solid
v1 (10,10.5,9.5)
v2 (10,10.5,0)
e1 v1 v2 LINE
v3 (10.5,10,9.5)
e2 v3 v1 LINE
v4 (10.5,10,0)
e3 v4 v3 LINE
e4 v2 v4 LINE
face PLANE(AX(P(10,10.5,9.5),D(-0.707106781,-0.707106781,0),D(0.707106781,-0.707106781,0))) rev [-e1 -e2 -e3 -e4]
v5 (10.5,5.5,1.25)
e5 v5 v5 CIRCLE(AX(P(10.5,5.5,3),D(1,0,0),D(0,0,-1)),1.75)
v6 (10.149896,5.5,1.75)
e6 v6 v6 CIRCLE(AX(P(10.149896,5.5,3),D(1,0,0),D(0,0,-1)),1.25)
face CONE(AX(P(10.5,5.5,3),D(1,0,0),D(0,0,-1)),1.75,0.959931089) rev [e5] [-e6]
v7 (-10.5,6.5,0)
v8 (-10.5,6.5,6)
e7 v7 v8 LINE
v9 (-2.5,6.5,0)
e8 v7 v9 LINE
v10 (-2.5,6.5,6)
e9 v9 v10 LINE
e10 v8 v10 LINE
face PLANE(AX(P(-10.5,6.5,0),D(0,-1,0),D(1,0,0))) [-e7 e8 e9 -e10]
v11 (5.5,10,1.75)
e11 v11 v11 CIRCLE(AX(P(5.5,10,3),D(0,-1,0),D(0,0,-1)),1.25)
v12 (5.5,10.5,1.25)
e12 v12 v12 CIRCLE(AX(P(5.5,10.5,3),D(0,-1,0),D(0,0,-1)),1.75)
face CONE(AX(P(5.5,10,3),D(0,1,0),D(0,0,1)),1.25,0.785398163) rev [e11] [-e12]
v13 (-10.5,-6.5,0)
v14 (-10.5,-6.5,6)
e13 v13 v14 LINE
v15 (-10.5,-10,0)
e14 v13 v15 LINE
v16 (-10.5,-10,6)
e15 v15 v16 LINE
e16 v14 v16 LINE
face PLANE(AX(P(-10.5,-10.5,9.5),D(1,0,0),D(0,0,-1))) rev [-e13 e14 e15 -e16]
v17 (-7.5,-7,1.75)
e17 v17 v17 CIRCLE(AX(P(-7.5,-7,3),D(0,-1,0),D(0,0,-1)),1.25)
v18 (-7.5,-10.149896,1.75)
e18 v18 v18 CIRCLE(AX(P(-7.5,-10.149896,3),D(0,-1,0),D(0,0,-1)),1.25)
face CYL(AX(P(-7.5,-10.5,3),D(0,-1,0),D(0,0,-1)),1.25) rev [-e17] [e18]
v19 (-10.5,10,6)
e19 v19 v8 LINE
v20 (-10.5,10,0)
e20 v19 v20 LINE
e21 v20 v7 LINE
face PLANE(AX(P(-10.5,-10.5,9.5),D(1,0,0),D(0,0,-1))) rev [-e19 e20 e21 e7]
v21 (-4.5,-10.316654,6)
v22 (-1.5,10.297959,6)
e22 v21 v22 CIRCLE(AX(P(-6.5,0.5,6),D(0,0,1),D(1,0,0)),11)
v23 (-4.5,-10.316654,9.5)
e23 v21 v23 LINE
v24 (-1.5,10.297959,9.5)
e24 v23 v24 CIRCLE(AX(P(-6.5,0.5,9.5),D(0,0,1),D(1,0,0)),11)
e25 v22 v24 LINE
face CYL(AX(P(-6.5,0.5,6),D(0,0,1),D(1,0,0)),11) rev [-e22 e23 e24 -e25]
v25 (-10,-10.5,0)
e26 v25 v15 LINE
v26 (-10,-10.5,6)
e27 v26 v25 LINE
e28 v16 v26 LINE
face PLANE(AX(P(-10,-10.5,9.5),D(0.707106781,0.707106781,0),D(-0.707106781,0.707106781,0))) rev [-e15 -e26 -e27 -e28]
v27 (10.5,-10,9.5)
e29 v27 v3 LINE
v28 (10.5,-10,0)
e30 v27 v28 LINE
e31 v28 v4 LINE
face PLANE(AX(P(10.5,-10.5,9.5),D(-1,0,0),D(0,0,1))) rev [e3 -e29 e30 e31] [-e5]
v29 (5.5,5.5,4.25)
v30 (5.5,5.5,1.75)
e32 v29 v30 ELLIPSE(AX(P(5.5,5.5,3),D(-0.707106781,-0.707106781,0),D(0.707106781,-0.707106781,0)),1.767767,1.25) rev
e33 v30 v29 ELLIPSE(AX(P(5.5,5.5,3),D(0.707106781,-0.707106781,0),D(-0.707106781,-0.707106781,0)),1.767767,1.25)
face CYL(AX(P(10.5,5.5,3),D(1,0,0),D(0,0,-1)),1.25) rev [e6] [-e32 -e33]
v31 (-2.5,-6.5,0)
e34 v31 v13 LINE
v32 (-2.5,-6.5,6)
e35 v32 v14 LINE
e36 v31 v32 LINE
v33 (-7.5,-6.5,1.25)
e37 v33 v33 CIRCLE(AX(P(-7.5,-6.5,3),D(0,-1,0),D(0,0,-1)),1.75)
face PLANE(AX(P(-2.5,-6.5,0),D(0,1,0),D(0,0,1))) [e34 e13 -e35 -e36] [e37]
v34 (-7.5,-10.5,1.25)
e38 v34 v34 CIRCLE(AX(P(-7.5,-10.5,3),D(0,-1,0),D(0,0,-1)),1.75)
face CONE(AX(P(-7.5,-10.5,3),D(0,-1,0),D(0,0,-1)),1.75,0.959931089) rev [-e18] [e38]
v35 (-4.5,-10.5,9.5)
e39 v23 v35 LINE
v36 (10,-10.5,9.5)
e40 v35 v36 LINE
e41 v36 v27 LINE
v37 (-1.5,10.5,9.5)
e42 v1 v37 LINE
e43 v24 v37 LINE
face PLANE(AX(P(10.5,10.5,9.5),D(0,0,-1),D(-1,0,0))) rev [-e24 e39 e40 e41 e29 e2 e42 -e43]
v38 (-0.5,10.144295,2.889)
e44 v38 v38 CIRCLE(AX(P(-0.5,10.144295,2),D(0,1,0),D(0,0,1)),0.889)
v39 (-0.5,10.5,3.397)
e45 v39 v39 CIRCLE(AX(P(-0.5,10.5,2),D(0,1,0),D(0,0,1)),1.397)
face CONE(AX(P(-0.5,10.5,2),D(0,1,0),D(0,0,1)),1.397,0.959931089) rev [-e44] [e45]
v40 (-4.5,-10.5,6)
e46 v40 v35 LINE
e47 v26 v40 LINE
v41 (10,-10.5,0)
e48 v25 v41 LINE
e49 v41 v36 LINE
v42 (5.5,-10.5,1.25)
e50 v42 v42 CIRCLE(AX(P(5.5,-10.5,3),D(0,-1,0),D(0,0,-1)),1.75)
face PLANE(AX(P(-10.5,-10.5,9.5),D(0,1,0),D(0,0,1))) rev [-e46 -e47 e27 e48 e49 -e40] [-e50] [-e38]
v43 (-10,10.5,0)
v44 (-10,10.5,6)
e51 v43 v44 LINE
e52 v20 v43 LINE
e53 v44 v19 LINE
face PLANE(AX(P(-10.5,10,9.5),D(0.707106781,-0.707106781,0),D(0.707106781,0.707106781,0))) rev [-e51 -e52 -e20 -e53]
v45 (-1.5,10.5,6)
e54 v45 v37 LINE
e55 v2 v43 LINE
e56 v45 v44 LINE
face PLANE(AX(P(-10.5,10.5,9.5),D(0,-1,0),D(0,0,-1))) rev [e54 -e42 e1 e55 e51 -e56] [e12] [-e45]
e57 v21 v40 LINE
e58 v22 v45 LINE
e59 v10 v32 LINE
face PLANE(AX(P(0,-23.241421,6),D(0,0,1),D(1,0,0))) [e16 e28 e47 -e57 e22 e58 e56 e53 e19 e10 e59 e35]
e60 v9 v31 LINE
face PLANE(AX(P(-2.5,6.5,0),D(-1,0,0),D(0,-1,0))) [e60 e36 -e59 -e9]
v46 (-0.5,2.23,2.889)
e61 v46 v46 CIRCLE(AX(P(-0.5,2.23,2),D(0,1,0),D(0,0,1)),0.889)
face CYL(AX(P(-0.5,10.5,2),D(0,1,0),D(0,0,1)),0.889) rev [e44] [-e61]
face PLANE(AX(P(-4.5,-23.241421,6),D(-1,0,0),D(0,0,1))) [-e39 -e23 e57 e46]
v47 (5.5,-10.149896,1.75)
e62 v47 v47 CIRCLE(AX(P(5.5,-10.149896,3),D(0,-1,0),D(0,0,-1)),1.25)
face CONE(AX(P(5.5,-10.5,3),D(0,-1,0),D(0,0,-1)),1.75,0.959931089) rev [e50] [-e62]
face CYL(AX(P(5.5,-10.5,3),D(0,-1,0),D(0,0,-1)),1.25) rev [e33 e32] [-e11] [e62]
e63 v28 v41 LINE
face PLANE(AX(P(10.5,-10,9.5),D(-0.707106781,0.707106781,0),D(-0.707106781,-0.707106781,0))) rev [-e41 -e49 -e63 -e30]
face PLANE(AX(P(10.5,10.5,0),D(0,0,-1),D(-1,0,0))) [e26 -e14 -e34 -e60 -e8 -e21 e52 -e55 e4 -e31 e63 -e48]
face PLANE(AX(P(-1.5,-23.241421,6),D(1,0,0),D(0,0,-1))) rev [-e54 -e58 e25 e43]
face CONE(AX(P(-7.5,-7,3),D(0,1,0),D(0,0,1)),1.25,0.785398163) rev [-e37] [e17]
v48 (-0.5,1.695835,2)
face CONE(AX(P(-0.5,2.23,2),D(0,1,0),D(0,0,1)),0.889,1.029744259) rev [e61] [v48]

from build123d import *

# Parameters (mm, degrees)
SKETCH_1_W                    = 21
SKETCH_1_H                    = 21
EXTRUDE_1_DEPTH               = 9.5
CUT_EXTRUDE_3_DEPTH           = 3.5
CUT_EXTRUDE_4_DEPTH           = 18.628102564
CHAMFER_1_SIZE                = 0.5
HOLE_WIZARD_2_561_D           = 1.778
HOLE_WIZARD_2_561_DEPTH       = 8.27
HOLE_WIZARD_2_561_CSINK_D     = 2.794
HOLE_WIZARD_2_561_CSINK_ANGLE = 110
HOLE_WIZARD_2_561_TIP         = 0.53416509


# Read off the part's stored shape, not the designer's step: Отверстие обработанное метчиком M31, Отверстие обработанное метчиком M32
with BuildPart() as part:
    # Эскиз1 → Бобышка-Вытянуть1 (new body)
    with BuildSketch(Plane.XY):
        Rectangle(SKETCH_1_W, SKETCH_1_H)
    extrude(amount=EXTRUDE_1_DEPTH)

    # Эскиз2 → Вырез-Вытянуть3 (cut)
    with BuildSketch(Plane.XY.offset(9.5)):
        with BuildLine():
            ThreePointArc((-4.5, -10.316653826), (4.385337165, -1.084119567), (-1.5, 10.297958971))
            Line((-1.5, 10.297958971), (-1.5, 10.5))
            Line((-1.5, 10.5), (-10.5, 10.5))
            Line((-10.5, 10.5), (-10.5, -10.5))
            Line((-10.5, -10.5), (-4.5, -10.5))
            Line((-4.5, -10.5), (-4.5, -10.316653826))
        make_face()
    extrude(amount=-CUT_EXTRUDE_3_DEPTH, mode=Mode.SUBTRACT)

    # Эскиз3 → Вырез-Вытянуть4 (cut, through all)
    with BuildSketch(Plane(origin=(0, 0, 0), x_dir=(-1, 0, 0), z_dir=(0, 0, -1))):
        Polygon((74.537024344, 6.5), (10.5, 6.5), (2.5, 6.5), (2.5, -6.5), (10.5, -6.5), (74.537024344, -6.5), (202.611073033, -6.5), (202.611073033, 6.5), align=None)
    extrude(amount=-CUT_EXTRUDE_4_DEPTH, mode=Mode.SUBTRACT)

    # Отверстие обработанное метчиком M31 outline → Отверстие обработанное метчиком M31 (revolve, cut)
    with BuildSketch(Plane(origin=(5.5, 0, 3), x_dir=(1, 0, 0), z_dir=(0, 0, 1))):
        Polygon((1.75, 10.5), (0, 10.5), (0, -10.5), (1.75, -10.5), (1.25, -10.149896231), (1.25, 10), align=None)
    revolve(axis=Axis((5.5, 0, 3), (0, 1, 0)), mode=Mode.SUBTRACT)

    # Hole Wizard M31 2 outline → Hole Wizard M31 2 (revolve, cut)
    with BuildSketch(Plane(origin=(-7.5, 0, 3), x_dir=(1, 0, 0), z_dir=(0, 0, 1))):
        Polygon((1.75, -6.5), (0, -6.5), (0, -10.5), (1.75, -10.5), (1.25, -10.149896231), (1.25, -7), align=None)
    revolve(axis=Axis((-7.5, 0, 3), (0, 1, 0)), mode=Mode.SUBTRACT)

    # Фаска1
    chamfer_1_edges = [part.edges().sort_by_distance(p)[0] for p in [
        (-10.5, -10.5, 3),
        (-10.5, 10.5, 3),
        (10.5, -10.5, 4.75),
        (10.5, 10.5, 4.75),
    ]]
    chamfer(chamfer_1_edges, length=CHAMFER_1_SIZE)

    # Отверстие обработанное метчиком #2-561
    with Locations(Plane(origin=(0, 10.5, 0), x_dir=(-1, 0, 0), z_dir=(0, 1, 0))):
        with Locations((0.5, 2)):
            CounterSinkHole(HOLE_WIZARD_2_561_D / 2, HOLE_WIZARD_2_561_CSINK_D / 2, depth=HOLE_WIZARD_2_561_DEPTH, counter_sink_angle=HOLE_WIZARD_2_561_CSINK_ANGLE)
            with Locations((0, 0, -(HOLE_WIZARD_2_561_DEPTH + HOLE_WIZARD_2_561_TIP / 2))):  # 118° drill point
                Cone(0, HOLE_WIZARD_2_561_D / 2, HOLE_WIZARD_2_561_TIP, mode=Mode.SUBTRACT)

    # Отверстие обработанное метчиком M32 outline → Отверстие обработанное метчиком M32 (revolve, cut)
    with BuildSketch(Plane(origin=(0, 5.5, 3), x_dir=(0, 1, 0), z_dir=(0, 0, -1))):
        Polygon((0, 5.5), (1.25, 5.5), (1.25, 10.149896231), (1.75, 10.5), (0, 10.5), align=None)
    revolve(axis=Axis((0, 5.5, 3), (1, 0, 0)), mode=Mode.SUBTRACT)


solid = part.part
